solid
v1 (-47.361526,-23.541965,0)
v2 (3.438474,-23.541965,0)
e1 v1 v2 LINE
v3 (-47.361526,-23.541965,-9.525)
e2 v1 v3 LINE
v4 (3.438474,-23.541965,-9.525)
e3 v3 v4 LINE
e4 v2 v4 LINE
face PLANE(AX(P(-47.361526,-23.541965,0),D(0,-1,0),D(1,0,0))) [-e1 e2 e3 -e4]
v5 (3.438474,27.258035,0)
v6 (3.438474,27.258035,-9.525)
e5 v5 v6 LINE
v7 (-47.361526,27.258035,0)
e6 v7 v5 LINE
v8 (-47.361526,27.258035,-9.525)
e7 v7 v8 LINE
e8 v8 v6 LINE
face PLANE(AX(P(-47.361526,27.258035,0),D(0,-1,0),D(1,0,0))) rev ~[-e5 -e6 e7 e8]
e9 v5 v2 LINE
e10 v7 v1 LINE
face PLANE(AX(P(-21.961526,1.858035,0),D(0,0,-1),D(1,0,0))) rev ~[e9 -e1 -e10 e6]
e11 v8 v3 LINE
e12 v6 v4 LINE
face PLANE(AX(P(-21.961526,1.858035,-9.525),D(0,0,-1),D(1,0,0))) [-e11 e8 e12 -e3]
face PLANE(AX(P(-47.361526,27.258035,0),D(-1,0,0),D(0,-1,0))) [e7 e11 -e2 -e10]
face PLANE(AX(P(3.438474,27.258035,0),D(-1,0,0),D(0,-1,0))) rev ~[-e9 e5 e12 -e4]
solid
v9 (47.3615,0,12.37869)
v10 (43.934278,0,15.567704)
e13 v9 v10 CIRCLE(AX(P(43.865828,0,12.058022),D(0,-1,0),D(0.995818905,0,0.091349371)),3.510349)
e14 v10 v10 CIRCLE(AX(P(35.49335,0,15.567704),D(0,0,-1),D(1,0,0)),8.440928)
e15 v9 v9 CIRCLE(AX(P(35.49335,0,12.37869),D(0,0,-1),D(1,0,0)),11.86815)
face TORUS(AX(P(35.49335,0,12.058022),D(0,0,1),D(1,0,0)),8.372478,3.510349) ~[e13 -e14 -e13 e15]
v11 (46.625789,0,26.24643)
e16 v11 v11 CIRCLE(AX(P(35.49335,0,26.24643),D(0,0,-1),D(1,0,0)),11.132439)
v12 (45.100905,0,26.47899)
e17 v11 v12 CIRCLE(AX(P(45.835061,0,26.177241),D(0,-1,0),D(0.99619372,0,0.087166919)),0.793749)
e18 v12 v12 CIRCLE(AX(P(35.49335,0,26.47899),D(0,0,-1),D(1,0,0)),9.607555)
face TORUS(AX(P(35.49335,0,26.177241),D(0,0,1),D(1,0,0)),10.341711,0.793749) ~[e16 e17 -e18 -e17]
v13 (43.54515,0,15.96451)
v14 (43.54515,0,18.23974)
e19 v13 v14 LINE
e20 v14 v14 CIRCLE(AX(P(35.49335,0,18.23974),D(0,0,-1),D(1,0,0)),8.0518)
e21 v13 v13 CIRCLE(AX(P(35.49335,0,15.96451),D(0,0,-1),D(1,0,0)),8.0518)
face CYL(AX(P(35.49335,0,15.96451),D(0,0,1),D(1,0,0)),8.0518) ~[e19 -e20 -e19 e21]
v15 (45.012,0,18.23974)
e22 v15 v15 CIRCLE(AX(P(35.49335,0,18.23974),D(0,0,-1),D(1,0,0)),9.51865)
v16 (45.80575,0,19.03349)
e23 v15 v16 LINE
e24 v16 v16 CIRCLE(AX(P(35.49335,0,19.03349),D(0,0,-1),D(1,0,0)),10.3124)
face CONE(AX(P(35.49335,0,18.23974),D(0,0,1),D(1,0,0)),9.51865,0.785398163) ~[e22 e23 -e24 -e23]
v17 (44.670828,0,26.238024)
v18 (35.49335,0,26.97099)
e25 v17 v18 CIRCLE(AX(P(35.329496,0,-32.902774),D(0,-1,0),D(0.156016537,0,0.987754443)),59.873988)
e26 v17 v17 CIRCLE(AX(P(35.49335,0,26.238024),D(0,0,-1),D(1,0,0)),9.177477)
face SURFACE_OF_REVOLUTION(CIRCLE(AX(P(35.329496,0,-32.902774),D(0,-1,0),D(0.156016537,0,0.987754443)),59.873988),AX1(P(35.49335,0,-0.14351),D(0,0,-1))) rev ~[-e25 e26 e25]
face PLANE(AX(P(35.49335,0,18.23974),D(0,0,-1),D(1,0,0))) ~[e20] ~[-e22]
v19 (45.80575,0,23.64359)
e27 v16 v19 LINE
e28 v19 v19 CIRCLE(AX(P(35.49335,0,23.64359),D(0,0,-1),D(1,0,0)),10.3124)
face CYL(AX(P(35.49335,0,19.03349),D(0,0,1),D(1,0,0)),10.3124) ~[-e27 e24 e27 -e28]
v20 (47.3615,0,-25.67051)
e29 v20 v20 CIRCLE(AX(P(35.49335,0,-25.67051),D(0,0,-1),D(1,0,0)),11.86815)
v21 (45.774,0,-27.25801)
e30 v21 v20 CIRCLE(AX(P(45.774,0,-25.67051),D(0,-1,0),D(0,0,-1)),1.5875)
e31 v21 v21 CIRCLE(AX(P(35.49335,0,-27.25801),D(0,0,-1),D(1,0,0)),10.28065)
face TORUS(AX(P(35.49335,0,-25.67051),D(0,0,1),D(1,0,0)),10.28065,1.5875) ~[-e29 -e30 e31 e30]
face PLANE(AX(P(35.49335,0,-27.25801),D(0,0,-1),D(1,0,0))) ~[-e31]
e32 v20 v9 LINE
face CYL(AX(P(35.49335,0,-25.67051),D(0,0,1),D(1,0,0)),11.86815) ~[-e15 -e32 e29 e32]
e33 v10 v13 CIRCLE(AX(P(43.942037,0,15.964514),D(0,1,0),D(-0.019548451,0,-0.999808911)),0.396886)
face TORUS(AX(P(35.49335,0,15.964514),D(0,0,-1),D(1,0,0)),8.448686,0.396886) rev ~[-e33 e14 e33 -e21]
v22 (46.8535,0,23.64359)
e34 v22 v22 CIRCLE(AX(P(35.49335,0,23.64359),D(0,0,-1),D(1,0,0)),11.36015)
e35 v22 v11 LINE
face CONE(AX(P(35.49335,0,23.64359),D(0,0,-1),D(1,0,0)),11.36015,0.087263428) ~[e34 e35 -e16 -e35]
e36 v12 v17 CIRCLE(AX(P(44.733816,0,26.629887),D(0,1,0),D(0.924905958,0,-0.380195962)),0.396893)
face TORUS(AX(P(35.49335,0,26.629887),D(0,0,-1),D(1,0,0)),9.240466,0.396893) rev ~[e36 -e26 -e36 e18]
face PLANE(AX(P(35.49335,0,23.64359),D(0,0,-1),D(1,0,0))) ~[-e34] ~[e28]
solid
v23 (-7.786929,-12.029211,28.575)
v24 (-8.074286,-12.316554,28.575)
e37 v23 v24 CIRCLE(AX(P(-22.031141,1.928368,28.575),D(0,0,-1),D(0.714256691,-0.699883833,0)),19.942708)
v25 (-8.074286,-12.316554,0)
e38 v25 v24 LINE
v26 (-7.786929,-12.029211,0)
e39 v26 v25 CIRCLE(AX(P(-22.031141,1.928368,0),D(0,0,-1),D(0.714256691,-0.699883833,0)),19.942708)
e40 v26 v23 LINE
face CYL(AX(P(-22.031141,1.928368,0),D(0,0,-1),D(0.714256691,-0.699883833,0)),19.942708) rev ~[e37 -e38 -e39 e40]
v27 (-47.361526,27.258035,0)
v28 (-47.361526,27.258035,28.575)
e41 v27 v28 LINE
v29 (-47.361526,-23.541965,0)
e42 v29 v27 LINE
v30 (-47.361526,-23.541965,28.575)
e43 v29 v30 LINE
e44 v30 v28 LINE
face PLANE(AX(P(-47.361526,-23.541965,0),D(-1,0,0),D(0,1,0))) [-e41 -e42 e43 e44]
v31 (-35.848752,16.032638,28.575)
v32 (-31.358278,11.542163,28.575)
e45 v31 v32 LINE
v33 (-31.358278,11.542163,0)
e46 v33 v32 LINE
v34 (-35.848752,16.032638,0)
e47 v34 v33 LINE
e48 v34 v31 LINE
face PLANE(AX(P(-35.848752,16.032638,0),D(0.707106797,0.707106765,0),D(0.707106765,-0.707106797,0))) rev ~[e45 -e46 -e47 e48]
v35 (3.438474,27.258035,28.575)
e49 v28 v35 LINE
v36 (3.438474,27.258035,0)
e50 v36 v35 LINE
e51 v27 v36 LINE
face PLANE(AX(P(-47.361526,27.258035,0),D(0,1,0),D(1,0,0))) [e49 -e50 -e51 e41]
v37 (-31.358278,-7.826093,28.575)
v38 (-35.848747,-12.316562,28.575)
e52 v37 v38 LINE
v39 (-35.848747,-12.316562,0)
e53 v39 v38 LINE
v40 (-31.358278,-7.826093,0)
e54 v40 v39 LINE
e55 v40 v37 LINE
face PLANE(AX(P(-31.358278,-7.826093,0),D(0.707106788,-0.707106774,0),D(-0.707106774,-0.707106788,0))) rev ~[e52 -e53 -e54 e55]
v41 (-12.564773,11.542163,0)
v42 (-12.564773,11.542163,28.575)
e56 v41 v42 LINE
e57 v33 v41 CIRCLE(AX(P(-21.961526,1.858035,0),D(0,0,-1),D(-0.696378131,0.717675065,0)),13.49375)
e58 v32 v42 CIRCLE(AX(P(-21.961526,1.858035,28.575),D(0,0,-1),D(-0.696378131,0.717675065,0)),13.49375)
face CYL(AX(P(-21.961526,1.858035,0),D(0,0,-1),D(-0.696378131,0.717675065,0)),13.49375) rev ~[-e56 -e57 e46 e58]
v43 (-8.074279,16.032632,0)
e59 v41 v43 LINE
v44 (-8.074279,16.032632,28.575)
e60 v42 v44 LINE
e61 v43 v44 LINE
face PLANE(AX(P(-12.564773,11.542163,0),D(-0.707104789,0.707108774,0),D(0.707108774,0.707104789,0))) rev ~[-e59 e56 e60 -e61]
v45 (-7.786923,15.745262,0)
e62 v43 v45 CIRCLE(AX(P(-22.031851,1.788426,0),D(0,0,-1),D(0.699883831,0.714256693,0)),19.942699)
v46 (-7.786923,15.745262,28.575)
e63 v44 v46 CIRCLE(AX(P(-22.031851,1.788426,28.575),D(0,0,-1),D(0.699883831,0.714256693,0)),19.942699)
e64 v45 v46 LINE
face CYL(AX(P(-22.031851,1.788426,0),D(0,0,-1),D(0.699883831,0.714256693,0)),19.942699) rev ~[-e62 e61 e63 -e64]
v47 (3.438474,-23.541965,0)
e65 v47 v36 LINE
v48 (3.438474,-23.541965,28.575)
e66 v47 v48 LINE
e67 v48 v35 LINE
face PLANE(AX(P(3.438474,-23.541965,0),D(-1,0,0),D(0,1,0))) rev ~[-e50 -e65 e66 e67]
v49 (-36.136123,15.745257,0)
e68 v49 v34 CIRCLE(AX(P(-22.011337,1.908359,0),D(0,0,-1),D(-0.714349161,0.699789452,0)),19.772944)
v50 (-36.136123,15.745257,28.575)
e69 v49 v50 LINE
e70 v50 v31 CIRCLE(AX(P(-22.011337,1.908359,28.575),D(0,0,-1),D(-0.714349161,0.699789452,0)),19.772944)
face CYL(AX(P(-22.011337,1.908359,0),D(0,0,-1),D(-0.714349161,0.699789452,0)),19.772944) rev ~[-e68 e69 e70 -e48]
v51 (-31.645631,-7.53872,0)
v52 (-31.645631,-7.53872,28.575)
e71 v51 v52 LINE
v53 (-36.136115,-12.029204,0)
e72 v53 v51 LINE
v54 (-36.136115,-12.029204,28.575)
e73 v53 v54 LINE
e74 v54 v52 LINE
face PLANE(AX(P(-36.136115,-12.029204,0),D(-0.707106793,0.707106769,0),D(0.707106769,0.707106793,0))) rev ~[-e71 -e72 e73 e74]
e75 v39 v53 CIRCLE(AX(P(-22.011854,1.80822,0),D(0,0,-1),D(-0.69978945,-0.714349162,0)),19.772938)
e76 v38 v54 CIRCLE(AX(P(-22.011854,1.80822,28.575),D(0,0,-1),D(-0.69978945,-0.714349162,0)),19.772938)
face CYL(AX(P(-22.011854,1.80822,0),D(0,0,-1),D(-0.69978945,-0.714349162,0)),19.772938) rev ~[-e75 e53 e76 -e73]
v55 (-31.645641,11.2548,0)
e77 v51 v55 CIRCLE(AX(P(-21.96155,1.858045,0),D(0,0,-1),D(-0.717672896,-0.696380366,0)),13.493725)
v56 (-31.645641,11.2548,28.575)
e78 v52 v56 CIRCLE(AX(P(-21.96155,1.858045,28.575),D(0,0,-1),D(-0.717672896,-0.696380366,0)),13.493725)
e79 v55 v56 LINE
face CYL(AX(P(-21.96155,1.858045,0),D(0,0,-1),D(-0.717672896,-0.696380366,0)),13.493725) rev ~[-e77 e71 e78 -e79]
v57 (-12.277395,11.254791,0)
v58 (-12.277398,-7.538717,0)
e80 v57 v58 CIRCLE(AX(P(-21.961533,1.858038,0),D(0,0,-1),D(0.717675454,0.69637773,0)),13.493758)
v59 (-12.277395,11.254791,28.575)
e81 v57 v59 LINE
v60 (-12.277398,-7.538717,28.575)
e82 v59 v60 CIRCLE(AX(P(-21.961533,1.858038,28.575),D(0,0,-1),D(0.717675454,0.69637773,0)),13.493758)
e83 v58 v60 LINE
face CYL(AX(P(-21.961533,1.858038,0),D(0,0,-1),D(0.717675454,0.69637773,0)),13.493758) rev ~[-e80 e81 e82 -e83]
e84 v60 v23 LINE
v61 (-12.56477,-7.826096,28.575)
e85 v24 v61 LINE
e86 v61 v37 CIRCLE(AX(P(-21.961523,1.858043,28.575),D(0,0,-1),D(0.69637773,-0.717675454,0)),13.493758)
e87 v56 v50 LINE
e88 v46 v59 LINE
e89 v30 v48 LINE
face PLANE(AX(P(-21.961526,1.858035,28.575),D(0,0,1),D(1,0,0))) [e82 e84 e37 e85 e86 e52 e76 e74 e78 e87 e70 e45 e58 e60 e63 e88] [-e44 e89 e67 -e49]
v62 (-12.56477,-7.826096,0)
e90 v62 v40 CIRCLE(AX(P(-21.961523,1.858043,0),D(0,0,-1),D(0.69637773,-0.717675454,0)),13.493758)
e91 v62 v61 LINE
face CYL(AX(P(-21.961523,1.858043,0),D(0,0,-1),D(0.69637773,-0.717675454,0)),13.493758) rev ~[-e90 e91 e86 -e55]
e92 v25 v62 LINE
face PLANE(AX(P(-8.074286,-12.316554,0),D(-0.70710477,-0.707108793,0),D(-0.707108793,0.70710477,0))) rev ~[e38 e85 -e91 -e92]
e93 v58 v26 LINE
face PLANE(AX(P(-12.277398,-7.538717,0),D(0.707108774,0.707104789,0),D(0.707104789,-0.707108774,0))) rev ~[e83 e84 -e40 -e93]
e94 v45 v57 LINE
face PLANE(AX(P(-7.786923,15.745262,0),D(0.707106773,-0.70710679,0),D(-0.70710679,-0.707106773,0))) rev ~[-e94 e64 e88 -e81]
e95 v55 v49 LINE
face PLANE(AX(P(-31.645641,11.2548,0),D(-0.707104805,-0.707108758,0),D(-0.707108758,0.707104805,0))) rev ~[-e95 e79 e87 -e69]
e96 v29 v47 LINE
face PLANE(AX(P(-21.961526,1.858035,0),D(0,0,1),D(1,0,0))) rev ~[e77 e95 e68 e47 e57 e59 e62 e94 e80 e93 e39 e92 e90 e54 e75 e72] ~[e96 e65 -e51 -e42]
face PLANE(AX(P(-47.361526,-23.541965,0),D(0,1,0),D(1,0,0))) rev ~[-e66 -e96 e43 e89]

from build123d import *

# Parameters (mm, degrees)
F0_W     = 50.8
F0_H     = 50.8
F1_DEPTH = 28.575
F2_W     = 50.8
F2_H     = 50.8
F3_DEPTH = 9.525


# Not quite as in the source:
# - ends of sketch curves that miss each other by under 0.0002 mm in the source are joined


with BuildPart() as f1:
    # F0 (on Top) → F1 (new body)
    with BuildSketch(Plane.XY):
        with Locations((-21.9615258, 1.8580354)):
            Rectangle(F0_W, F0_H)
        with BuildLine():
            ThreePointArc((-31.3582782013, 11.5421633096), (-21.9615258, 15.3517854), (-12.5647733987, 11.5421633096))
            Line((-12.5647733987, 11.5421633096), (-8.074279, 16.0326324))
            ThreePointArc((-8.074279, 16.0326324), (-7.9298691961, 15.8896791745), (-7.7869234772, 15.7452620149))
            Line((-7.7869234772, 15.7452620149), (-12.2773948, 11.2547908))
            ThreePointArc((-12.2773948, 11.2547908), (-8.4677758, 1.8580354), (-12.2773978904, -7.5387170013))
            Line((-12.2773978904, -7.5387170013), (-7.7869288, -12.0292114))
            ThreePointArc((-7.7869288, -12.0292114), (-7.9298756108, -12.1736147892), (-8.074286225, -12.3165542255))
            Line((-8.074286225, -12.3165542255), (-12.5647704, -7.8260956))
            ThreePointArc((-12.5647704, -7.8260956), (-21.9615258, -11.6357146), (-31.3582782013, -7.8260925096))
            Line((-31.3582782013, -7.8260925096), (-35.8487472, -12.3165616))
            ThreePointArc((-35.8487472, -12.3165616), (-35.9931695745, -12.1736212039), (-36.1361154255, -12.029204175))
            Line((-36.1361154255, -12.029204175), (-31.6456314, -7.53872))
            ThreePointArc((-31.6456314, -7.53872), (-35.4552758, 1.8580354), (-31.6456413921, 11.2548004956))
            Line((-31.6456413921, 11.2548004956), (-36.1361228, 15.7452568))
            ThreePointArc((-36.1361228, 15.7452568), (-35.9931759892, 15.8896855892), (-35.8487524149, 16.0326377228))
            Line((-35.8487524149, 16.0326377228), (-31.3582782013, 11.5421633096))
        make_face(mode=Mode.SUBTRACT)
    extrude(amount=F1_DEPTH)


with BuildPart() as f3:
    # F2 (on face) → F3 (new body)
    with BuildSketch(Plane(origin=(0, 0, 0), x_dir=(1, 0, 0), z_dir=(0, 0, -1))):
        with Locations((-21.9615258, -1.8580354)):
            Rectangle(F2_W, F2_H)
    extrude(amount=F3_DEPTH)


with BuildPart() as f5:
    # F4 (on Front) → F5 (revolve)
    with BuildSketch(Plane.XZ):
        with BuildLine():
            Line((35.4933504, 26.97099), (35.4933504, -27.25801))
            Line((35.4933504, -27.25801), (45.7740004, -27.25801))
            ThreePointArc((45.7740004, -27.25801), (46.8965324151, -26.7930420151), (47.3615004, -25.67051))
            Line((47.3615004, -25.67051), (47.3615004, 12.37869))
            ThreePointArc((47.3615004, 12.37869), (46.2571032279, 14.627915971), (43.9342782618, 15.5677037122))
            ThreePointArc((43.9342782618, 15.5677037122), (43.6586666515, 15.6866290767), (43.5451504, 15.9645096))
            Line((43.5451504, 15.9645096), (43.5451504, 18.23974))
            Line((43.5451504, 18.23974), (45.0120004, 18.23974))
            Line((45.0120004, 18.23974), (45.8057504, 19.03349))
            Line((45.8057504, 19.03349), (45.8057504, 23.64359))
            Line((45.8057504, 23.64359), (46.8535004, 23.64359))
            Line((46.8535004, 23.64359), (46.6257894, 26.2464296))
            ThreePointArc((46.6257894, 26.2464296), (45.954733078, 26.9619169371), (45.1009053301, 26.4789899736))
            ThreePointArc((45.1009053301, 26.4789899736), (44.9278136613, 26.2836367625), (44.6708278714, 26.2380238884))
            ThreePointArc((44.6708278714, 26.2380238884), (40.096198354, 26.781168636), (35.4933504, 26.97099))
        make_face()
    revolve(axis=Axis((35.4933504, 0, -0.14351), (0, 0, -1)))


solid = Compound([f1.part, f3.part, f5.part])
